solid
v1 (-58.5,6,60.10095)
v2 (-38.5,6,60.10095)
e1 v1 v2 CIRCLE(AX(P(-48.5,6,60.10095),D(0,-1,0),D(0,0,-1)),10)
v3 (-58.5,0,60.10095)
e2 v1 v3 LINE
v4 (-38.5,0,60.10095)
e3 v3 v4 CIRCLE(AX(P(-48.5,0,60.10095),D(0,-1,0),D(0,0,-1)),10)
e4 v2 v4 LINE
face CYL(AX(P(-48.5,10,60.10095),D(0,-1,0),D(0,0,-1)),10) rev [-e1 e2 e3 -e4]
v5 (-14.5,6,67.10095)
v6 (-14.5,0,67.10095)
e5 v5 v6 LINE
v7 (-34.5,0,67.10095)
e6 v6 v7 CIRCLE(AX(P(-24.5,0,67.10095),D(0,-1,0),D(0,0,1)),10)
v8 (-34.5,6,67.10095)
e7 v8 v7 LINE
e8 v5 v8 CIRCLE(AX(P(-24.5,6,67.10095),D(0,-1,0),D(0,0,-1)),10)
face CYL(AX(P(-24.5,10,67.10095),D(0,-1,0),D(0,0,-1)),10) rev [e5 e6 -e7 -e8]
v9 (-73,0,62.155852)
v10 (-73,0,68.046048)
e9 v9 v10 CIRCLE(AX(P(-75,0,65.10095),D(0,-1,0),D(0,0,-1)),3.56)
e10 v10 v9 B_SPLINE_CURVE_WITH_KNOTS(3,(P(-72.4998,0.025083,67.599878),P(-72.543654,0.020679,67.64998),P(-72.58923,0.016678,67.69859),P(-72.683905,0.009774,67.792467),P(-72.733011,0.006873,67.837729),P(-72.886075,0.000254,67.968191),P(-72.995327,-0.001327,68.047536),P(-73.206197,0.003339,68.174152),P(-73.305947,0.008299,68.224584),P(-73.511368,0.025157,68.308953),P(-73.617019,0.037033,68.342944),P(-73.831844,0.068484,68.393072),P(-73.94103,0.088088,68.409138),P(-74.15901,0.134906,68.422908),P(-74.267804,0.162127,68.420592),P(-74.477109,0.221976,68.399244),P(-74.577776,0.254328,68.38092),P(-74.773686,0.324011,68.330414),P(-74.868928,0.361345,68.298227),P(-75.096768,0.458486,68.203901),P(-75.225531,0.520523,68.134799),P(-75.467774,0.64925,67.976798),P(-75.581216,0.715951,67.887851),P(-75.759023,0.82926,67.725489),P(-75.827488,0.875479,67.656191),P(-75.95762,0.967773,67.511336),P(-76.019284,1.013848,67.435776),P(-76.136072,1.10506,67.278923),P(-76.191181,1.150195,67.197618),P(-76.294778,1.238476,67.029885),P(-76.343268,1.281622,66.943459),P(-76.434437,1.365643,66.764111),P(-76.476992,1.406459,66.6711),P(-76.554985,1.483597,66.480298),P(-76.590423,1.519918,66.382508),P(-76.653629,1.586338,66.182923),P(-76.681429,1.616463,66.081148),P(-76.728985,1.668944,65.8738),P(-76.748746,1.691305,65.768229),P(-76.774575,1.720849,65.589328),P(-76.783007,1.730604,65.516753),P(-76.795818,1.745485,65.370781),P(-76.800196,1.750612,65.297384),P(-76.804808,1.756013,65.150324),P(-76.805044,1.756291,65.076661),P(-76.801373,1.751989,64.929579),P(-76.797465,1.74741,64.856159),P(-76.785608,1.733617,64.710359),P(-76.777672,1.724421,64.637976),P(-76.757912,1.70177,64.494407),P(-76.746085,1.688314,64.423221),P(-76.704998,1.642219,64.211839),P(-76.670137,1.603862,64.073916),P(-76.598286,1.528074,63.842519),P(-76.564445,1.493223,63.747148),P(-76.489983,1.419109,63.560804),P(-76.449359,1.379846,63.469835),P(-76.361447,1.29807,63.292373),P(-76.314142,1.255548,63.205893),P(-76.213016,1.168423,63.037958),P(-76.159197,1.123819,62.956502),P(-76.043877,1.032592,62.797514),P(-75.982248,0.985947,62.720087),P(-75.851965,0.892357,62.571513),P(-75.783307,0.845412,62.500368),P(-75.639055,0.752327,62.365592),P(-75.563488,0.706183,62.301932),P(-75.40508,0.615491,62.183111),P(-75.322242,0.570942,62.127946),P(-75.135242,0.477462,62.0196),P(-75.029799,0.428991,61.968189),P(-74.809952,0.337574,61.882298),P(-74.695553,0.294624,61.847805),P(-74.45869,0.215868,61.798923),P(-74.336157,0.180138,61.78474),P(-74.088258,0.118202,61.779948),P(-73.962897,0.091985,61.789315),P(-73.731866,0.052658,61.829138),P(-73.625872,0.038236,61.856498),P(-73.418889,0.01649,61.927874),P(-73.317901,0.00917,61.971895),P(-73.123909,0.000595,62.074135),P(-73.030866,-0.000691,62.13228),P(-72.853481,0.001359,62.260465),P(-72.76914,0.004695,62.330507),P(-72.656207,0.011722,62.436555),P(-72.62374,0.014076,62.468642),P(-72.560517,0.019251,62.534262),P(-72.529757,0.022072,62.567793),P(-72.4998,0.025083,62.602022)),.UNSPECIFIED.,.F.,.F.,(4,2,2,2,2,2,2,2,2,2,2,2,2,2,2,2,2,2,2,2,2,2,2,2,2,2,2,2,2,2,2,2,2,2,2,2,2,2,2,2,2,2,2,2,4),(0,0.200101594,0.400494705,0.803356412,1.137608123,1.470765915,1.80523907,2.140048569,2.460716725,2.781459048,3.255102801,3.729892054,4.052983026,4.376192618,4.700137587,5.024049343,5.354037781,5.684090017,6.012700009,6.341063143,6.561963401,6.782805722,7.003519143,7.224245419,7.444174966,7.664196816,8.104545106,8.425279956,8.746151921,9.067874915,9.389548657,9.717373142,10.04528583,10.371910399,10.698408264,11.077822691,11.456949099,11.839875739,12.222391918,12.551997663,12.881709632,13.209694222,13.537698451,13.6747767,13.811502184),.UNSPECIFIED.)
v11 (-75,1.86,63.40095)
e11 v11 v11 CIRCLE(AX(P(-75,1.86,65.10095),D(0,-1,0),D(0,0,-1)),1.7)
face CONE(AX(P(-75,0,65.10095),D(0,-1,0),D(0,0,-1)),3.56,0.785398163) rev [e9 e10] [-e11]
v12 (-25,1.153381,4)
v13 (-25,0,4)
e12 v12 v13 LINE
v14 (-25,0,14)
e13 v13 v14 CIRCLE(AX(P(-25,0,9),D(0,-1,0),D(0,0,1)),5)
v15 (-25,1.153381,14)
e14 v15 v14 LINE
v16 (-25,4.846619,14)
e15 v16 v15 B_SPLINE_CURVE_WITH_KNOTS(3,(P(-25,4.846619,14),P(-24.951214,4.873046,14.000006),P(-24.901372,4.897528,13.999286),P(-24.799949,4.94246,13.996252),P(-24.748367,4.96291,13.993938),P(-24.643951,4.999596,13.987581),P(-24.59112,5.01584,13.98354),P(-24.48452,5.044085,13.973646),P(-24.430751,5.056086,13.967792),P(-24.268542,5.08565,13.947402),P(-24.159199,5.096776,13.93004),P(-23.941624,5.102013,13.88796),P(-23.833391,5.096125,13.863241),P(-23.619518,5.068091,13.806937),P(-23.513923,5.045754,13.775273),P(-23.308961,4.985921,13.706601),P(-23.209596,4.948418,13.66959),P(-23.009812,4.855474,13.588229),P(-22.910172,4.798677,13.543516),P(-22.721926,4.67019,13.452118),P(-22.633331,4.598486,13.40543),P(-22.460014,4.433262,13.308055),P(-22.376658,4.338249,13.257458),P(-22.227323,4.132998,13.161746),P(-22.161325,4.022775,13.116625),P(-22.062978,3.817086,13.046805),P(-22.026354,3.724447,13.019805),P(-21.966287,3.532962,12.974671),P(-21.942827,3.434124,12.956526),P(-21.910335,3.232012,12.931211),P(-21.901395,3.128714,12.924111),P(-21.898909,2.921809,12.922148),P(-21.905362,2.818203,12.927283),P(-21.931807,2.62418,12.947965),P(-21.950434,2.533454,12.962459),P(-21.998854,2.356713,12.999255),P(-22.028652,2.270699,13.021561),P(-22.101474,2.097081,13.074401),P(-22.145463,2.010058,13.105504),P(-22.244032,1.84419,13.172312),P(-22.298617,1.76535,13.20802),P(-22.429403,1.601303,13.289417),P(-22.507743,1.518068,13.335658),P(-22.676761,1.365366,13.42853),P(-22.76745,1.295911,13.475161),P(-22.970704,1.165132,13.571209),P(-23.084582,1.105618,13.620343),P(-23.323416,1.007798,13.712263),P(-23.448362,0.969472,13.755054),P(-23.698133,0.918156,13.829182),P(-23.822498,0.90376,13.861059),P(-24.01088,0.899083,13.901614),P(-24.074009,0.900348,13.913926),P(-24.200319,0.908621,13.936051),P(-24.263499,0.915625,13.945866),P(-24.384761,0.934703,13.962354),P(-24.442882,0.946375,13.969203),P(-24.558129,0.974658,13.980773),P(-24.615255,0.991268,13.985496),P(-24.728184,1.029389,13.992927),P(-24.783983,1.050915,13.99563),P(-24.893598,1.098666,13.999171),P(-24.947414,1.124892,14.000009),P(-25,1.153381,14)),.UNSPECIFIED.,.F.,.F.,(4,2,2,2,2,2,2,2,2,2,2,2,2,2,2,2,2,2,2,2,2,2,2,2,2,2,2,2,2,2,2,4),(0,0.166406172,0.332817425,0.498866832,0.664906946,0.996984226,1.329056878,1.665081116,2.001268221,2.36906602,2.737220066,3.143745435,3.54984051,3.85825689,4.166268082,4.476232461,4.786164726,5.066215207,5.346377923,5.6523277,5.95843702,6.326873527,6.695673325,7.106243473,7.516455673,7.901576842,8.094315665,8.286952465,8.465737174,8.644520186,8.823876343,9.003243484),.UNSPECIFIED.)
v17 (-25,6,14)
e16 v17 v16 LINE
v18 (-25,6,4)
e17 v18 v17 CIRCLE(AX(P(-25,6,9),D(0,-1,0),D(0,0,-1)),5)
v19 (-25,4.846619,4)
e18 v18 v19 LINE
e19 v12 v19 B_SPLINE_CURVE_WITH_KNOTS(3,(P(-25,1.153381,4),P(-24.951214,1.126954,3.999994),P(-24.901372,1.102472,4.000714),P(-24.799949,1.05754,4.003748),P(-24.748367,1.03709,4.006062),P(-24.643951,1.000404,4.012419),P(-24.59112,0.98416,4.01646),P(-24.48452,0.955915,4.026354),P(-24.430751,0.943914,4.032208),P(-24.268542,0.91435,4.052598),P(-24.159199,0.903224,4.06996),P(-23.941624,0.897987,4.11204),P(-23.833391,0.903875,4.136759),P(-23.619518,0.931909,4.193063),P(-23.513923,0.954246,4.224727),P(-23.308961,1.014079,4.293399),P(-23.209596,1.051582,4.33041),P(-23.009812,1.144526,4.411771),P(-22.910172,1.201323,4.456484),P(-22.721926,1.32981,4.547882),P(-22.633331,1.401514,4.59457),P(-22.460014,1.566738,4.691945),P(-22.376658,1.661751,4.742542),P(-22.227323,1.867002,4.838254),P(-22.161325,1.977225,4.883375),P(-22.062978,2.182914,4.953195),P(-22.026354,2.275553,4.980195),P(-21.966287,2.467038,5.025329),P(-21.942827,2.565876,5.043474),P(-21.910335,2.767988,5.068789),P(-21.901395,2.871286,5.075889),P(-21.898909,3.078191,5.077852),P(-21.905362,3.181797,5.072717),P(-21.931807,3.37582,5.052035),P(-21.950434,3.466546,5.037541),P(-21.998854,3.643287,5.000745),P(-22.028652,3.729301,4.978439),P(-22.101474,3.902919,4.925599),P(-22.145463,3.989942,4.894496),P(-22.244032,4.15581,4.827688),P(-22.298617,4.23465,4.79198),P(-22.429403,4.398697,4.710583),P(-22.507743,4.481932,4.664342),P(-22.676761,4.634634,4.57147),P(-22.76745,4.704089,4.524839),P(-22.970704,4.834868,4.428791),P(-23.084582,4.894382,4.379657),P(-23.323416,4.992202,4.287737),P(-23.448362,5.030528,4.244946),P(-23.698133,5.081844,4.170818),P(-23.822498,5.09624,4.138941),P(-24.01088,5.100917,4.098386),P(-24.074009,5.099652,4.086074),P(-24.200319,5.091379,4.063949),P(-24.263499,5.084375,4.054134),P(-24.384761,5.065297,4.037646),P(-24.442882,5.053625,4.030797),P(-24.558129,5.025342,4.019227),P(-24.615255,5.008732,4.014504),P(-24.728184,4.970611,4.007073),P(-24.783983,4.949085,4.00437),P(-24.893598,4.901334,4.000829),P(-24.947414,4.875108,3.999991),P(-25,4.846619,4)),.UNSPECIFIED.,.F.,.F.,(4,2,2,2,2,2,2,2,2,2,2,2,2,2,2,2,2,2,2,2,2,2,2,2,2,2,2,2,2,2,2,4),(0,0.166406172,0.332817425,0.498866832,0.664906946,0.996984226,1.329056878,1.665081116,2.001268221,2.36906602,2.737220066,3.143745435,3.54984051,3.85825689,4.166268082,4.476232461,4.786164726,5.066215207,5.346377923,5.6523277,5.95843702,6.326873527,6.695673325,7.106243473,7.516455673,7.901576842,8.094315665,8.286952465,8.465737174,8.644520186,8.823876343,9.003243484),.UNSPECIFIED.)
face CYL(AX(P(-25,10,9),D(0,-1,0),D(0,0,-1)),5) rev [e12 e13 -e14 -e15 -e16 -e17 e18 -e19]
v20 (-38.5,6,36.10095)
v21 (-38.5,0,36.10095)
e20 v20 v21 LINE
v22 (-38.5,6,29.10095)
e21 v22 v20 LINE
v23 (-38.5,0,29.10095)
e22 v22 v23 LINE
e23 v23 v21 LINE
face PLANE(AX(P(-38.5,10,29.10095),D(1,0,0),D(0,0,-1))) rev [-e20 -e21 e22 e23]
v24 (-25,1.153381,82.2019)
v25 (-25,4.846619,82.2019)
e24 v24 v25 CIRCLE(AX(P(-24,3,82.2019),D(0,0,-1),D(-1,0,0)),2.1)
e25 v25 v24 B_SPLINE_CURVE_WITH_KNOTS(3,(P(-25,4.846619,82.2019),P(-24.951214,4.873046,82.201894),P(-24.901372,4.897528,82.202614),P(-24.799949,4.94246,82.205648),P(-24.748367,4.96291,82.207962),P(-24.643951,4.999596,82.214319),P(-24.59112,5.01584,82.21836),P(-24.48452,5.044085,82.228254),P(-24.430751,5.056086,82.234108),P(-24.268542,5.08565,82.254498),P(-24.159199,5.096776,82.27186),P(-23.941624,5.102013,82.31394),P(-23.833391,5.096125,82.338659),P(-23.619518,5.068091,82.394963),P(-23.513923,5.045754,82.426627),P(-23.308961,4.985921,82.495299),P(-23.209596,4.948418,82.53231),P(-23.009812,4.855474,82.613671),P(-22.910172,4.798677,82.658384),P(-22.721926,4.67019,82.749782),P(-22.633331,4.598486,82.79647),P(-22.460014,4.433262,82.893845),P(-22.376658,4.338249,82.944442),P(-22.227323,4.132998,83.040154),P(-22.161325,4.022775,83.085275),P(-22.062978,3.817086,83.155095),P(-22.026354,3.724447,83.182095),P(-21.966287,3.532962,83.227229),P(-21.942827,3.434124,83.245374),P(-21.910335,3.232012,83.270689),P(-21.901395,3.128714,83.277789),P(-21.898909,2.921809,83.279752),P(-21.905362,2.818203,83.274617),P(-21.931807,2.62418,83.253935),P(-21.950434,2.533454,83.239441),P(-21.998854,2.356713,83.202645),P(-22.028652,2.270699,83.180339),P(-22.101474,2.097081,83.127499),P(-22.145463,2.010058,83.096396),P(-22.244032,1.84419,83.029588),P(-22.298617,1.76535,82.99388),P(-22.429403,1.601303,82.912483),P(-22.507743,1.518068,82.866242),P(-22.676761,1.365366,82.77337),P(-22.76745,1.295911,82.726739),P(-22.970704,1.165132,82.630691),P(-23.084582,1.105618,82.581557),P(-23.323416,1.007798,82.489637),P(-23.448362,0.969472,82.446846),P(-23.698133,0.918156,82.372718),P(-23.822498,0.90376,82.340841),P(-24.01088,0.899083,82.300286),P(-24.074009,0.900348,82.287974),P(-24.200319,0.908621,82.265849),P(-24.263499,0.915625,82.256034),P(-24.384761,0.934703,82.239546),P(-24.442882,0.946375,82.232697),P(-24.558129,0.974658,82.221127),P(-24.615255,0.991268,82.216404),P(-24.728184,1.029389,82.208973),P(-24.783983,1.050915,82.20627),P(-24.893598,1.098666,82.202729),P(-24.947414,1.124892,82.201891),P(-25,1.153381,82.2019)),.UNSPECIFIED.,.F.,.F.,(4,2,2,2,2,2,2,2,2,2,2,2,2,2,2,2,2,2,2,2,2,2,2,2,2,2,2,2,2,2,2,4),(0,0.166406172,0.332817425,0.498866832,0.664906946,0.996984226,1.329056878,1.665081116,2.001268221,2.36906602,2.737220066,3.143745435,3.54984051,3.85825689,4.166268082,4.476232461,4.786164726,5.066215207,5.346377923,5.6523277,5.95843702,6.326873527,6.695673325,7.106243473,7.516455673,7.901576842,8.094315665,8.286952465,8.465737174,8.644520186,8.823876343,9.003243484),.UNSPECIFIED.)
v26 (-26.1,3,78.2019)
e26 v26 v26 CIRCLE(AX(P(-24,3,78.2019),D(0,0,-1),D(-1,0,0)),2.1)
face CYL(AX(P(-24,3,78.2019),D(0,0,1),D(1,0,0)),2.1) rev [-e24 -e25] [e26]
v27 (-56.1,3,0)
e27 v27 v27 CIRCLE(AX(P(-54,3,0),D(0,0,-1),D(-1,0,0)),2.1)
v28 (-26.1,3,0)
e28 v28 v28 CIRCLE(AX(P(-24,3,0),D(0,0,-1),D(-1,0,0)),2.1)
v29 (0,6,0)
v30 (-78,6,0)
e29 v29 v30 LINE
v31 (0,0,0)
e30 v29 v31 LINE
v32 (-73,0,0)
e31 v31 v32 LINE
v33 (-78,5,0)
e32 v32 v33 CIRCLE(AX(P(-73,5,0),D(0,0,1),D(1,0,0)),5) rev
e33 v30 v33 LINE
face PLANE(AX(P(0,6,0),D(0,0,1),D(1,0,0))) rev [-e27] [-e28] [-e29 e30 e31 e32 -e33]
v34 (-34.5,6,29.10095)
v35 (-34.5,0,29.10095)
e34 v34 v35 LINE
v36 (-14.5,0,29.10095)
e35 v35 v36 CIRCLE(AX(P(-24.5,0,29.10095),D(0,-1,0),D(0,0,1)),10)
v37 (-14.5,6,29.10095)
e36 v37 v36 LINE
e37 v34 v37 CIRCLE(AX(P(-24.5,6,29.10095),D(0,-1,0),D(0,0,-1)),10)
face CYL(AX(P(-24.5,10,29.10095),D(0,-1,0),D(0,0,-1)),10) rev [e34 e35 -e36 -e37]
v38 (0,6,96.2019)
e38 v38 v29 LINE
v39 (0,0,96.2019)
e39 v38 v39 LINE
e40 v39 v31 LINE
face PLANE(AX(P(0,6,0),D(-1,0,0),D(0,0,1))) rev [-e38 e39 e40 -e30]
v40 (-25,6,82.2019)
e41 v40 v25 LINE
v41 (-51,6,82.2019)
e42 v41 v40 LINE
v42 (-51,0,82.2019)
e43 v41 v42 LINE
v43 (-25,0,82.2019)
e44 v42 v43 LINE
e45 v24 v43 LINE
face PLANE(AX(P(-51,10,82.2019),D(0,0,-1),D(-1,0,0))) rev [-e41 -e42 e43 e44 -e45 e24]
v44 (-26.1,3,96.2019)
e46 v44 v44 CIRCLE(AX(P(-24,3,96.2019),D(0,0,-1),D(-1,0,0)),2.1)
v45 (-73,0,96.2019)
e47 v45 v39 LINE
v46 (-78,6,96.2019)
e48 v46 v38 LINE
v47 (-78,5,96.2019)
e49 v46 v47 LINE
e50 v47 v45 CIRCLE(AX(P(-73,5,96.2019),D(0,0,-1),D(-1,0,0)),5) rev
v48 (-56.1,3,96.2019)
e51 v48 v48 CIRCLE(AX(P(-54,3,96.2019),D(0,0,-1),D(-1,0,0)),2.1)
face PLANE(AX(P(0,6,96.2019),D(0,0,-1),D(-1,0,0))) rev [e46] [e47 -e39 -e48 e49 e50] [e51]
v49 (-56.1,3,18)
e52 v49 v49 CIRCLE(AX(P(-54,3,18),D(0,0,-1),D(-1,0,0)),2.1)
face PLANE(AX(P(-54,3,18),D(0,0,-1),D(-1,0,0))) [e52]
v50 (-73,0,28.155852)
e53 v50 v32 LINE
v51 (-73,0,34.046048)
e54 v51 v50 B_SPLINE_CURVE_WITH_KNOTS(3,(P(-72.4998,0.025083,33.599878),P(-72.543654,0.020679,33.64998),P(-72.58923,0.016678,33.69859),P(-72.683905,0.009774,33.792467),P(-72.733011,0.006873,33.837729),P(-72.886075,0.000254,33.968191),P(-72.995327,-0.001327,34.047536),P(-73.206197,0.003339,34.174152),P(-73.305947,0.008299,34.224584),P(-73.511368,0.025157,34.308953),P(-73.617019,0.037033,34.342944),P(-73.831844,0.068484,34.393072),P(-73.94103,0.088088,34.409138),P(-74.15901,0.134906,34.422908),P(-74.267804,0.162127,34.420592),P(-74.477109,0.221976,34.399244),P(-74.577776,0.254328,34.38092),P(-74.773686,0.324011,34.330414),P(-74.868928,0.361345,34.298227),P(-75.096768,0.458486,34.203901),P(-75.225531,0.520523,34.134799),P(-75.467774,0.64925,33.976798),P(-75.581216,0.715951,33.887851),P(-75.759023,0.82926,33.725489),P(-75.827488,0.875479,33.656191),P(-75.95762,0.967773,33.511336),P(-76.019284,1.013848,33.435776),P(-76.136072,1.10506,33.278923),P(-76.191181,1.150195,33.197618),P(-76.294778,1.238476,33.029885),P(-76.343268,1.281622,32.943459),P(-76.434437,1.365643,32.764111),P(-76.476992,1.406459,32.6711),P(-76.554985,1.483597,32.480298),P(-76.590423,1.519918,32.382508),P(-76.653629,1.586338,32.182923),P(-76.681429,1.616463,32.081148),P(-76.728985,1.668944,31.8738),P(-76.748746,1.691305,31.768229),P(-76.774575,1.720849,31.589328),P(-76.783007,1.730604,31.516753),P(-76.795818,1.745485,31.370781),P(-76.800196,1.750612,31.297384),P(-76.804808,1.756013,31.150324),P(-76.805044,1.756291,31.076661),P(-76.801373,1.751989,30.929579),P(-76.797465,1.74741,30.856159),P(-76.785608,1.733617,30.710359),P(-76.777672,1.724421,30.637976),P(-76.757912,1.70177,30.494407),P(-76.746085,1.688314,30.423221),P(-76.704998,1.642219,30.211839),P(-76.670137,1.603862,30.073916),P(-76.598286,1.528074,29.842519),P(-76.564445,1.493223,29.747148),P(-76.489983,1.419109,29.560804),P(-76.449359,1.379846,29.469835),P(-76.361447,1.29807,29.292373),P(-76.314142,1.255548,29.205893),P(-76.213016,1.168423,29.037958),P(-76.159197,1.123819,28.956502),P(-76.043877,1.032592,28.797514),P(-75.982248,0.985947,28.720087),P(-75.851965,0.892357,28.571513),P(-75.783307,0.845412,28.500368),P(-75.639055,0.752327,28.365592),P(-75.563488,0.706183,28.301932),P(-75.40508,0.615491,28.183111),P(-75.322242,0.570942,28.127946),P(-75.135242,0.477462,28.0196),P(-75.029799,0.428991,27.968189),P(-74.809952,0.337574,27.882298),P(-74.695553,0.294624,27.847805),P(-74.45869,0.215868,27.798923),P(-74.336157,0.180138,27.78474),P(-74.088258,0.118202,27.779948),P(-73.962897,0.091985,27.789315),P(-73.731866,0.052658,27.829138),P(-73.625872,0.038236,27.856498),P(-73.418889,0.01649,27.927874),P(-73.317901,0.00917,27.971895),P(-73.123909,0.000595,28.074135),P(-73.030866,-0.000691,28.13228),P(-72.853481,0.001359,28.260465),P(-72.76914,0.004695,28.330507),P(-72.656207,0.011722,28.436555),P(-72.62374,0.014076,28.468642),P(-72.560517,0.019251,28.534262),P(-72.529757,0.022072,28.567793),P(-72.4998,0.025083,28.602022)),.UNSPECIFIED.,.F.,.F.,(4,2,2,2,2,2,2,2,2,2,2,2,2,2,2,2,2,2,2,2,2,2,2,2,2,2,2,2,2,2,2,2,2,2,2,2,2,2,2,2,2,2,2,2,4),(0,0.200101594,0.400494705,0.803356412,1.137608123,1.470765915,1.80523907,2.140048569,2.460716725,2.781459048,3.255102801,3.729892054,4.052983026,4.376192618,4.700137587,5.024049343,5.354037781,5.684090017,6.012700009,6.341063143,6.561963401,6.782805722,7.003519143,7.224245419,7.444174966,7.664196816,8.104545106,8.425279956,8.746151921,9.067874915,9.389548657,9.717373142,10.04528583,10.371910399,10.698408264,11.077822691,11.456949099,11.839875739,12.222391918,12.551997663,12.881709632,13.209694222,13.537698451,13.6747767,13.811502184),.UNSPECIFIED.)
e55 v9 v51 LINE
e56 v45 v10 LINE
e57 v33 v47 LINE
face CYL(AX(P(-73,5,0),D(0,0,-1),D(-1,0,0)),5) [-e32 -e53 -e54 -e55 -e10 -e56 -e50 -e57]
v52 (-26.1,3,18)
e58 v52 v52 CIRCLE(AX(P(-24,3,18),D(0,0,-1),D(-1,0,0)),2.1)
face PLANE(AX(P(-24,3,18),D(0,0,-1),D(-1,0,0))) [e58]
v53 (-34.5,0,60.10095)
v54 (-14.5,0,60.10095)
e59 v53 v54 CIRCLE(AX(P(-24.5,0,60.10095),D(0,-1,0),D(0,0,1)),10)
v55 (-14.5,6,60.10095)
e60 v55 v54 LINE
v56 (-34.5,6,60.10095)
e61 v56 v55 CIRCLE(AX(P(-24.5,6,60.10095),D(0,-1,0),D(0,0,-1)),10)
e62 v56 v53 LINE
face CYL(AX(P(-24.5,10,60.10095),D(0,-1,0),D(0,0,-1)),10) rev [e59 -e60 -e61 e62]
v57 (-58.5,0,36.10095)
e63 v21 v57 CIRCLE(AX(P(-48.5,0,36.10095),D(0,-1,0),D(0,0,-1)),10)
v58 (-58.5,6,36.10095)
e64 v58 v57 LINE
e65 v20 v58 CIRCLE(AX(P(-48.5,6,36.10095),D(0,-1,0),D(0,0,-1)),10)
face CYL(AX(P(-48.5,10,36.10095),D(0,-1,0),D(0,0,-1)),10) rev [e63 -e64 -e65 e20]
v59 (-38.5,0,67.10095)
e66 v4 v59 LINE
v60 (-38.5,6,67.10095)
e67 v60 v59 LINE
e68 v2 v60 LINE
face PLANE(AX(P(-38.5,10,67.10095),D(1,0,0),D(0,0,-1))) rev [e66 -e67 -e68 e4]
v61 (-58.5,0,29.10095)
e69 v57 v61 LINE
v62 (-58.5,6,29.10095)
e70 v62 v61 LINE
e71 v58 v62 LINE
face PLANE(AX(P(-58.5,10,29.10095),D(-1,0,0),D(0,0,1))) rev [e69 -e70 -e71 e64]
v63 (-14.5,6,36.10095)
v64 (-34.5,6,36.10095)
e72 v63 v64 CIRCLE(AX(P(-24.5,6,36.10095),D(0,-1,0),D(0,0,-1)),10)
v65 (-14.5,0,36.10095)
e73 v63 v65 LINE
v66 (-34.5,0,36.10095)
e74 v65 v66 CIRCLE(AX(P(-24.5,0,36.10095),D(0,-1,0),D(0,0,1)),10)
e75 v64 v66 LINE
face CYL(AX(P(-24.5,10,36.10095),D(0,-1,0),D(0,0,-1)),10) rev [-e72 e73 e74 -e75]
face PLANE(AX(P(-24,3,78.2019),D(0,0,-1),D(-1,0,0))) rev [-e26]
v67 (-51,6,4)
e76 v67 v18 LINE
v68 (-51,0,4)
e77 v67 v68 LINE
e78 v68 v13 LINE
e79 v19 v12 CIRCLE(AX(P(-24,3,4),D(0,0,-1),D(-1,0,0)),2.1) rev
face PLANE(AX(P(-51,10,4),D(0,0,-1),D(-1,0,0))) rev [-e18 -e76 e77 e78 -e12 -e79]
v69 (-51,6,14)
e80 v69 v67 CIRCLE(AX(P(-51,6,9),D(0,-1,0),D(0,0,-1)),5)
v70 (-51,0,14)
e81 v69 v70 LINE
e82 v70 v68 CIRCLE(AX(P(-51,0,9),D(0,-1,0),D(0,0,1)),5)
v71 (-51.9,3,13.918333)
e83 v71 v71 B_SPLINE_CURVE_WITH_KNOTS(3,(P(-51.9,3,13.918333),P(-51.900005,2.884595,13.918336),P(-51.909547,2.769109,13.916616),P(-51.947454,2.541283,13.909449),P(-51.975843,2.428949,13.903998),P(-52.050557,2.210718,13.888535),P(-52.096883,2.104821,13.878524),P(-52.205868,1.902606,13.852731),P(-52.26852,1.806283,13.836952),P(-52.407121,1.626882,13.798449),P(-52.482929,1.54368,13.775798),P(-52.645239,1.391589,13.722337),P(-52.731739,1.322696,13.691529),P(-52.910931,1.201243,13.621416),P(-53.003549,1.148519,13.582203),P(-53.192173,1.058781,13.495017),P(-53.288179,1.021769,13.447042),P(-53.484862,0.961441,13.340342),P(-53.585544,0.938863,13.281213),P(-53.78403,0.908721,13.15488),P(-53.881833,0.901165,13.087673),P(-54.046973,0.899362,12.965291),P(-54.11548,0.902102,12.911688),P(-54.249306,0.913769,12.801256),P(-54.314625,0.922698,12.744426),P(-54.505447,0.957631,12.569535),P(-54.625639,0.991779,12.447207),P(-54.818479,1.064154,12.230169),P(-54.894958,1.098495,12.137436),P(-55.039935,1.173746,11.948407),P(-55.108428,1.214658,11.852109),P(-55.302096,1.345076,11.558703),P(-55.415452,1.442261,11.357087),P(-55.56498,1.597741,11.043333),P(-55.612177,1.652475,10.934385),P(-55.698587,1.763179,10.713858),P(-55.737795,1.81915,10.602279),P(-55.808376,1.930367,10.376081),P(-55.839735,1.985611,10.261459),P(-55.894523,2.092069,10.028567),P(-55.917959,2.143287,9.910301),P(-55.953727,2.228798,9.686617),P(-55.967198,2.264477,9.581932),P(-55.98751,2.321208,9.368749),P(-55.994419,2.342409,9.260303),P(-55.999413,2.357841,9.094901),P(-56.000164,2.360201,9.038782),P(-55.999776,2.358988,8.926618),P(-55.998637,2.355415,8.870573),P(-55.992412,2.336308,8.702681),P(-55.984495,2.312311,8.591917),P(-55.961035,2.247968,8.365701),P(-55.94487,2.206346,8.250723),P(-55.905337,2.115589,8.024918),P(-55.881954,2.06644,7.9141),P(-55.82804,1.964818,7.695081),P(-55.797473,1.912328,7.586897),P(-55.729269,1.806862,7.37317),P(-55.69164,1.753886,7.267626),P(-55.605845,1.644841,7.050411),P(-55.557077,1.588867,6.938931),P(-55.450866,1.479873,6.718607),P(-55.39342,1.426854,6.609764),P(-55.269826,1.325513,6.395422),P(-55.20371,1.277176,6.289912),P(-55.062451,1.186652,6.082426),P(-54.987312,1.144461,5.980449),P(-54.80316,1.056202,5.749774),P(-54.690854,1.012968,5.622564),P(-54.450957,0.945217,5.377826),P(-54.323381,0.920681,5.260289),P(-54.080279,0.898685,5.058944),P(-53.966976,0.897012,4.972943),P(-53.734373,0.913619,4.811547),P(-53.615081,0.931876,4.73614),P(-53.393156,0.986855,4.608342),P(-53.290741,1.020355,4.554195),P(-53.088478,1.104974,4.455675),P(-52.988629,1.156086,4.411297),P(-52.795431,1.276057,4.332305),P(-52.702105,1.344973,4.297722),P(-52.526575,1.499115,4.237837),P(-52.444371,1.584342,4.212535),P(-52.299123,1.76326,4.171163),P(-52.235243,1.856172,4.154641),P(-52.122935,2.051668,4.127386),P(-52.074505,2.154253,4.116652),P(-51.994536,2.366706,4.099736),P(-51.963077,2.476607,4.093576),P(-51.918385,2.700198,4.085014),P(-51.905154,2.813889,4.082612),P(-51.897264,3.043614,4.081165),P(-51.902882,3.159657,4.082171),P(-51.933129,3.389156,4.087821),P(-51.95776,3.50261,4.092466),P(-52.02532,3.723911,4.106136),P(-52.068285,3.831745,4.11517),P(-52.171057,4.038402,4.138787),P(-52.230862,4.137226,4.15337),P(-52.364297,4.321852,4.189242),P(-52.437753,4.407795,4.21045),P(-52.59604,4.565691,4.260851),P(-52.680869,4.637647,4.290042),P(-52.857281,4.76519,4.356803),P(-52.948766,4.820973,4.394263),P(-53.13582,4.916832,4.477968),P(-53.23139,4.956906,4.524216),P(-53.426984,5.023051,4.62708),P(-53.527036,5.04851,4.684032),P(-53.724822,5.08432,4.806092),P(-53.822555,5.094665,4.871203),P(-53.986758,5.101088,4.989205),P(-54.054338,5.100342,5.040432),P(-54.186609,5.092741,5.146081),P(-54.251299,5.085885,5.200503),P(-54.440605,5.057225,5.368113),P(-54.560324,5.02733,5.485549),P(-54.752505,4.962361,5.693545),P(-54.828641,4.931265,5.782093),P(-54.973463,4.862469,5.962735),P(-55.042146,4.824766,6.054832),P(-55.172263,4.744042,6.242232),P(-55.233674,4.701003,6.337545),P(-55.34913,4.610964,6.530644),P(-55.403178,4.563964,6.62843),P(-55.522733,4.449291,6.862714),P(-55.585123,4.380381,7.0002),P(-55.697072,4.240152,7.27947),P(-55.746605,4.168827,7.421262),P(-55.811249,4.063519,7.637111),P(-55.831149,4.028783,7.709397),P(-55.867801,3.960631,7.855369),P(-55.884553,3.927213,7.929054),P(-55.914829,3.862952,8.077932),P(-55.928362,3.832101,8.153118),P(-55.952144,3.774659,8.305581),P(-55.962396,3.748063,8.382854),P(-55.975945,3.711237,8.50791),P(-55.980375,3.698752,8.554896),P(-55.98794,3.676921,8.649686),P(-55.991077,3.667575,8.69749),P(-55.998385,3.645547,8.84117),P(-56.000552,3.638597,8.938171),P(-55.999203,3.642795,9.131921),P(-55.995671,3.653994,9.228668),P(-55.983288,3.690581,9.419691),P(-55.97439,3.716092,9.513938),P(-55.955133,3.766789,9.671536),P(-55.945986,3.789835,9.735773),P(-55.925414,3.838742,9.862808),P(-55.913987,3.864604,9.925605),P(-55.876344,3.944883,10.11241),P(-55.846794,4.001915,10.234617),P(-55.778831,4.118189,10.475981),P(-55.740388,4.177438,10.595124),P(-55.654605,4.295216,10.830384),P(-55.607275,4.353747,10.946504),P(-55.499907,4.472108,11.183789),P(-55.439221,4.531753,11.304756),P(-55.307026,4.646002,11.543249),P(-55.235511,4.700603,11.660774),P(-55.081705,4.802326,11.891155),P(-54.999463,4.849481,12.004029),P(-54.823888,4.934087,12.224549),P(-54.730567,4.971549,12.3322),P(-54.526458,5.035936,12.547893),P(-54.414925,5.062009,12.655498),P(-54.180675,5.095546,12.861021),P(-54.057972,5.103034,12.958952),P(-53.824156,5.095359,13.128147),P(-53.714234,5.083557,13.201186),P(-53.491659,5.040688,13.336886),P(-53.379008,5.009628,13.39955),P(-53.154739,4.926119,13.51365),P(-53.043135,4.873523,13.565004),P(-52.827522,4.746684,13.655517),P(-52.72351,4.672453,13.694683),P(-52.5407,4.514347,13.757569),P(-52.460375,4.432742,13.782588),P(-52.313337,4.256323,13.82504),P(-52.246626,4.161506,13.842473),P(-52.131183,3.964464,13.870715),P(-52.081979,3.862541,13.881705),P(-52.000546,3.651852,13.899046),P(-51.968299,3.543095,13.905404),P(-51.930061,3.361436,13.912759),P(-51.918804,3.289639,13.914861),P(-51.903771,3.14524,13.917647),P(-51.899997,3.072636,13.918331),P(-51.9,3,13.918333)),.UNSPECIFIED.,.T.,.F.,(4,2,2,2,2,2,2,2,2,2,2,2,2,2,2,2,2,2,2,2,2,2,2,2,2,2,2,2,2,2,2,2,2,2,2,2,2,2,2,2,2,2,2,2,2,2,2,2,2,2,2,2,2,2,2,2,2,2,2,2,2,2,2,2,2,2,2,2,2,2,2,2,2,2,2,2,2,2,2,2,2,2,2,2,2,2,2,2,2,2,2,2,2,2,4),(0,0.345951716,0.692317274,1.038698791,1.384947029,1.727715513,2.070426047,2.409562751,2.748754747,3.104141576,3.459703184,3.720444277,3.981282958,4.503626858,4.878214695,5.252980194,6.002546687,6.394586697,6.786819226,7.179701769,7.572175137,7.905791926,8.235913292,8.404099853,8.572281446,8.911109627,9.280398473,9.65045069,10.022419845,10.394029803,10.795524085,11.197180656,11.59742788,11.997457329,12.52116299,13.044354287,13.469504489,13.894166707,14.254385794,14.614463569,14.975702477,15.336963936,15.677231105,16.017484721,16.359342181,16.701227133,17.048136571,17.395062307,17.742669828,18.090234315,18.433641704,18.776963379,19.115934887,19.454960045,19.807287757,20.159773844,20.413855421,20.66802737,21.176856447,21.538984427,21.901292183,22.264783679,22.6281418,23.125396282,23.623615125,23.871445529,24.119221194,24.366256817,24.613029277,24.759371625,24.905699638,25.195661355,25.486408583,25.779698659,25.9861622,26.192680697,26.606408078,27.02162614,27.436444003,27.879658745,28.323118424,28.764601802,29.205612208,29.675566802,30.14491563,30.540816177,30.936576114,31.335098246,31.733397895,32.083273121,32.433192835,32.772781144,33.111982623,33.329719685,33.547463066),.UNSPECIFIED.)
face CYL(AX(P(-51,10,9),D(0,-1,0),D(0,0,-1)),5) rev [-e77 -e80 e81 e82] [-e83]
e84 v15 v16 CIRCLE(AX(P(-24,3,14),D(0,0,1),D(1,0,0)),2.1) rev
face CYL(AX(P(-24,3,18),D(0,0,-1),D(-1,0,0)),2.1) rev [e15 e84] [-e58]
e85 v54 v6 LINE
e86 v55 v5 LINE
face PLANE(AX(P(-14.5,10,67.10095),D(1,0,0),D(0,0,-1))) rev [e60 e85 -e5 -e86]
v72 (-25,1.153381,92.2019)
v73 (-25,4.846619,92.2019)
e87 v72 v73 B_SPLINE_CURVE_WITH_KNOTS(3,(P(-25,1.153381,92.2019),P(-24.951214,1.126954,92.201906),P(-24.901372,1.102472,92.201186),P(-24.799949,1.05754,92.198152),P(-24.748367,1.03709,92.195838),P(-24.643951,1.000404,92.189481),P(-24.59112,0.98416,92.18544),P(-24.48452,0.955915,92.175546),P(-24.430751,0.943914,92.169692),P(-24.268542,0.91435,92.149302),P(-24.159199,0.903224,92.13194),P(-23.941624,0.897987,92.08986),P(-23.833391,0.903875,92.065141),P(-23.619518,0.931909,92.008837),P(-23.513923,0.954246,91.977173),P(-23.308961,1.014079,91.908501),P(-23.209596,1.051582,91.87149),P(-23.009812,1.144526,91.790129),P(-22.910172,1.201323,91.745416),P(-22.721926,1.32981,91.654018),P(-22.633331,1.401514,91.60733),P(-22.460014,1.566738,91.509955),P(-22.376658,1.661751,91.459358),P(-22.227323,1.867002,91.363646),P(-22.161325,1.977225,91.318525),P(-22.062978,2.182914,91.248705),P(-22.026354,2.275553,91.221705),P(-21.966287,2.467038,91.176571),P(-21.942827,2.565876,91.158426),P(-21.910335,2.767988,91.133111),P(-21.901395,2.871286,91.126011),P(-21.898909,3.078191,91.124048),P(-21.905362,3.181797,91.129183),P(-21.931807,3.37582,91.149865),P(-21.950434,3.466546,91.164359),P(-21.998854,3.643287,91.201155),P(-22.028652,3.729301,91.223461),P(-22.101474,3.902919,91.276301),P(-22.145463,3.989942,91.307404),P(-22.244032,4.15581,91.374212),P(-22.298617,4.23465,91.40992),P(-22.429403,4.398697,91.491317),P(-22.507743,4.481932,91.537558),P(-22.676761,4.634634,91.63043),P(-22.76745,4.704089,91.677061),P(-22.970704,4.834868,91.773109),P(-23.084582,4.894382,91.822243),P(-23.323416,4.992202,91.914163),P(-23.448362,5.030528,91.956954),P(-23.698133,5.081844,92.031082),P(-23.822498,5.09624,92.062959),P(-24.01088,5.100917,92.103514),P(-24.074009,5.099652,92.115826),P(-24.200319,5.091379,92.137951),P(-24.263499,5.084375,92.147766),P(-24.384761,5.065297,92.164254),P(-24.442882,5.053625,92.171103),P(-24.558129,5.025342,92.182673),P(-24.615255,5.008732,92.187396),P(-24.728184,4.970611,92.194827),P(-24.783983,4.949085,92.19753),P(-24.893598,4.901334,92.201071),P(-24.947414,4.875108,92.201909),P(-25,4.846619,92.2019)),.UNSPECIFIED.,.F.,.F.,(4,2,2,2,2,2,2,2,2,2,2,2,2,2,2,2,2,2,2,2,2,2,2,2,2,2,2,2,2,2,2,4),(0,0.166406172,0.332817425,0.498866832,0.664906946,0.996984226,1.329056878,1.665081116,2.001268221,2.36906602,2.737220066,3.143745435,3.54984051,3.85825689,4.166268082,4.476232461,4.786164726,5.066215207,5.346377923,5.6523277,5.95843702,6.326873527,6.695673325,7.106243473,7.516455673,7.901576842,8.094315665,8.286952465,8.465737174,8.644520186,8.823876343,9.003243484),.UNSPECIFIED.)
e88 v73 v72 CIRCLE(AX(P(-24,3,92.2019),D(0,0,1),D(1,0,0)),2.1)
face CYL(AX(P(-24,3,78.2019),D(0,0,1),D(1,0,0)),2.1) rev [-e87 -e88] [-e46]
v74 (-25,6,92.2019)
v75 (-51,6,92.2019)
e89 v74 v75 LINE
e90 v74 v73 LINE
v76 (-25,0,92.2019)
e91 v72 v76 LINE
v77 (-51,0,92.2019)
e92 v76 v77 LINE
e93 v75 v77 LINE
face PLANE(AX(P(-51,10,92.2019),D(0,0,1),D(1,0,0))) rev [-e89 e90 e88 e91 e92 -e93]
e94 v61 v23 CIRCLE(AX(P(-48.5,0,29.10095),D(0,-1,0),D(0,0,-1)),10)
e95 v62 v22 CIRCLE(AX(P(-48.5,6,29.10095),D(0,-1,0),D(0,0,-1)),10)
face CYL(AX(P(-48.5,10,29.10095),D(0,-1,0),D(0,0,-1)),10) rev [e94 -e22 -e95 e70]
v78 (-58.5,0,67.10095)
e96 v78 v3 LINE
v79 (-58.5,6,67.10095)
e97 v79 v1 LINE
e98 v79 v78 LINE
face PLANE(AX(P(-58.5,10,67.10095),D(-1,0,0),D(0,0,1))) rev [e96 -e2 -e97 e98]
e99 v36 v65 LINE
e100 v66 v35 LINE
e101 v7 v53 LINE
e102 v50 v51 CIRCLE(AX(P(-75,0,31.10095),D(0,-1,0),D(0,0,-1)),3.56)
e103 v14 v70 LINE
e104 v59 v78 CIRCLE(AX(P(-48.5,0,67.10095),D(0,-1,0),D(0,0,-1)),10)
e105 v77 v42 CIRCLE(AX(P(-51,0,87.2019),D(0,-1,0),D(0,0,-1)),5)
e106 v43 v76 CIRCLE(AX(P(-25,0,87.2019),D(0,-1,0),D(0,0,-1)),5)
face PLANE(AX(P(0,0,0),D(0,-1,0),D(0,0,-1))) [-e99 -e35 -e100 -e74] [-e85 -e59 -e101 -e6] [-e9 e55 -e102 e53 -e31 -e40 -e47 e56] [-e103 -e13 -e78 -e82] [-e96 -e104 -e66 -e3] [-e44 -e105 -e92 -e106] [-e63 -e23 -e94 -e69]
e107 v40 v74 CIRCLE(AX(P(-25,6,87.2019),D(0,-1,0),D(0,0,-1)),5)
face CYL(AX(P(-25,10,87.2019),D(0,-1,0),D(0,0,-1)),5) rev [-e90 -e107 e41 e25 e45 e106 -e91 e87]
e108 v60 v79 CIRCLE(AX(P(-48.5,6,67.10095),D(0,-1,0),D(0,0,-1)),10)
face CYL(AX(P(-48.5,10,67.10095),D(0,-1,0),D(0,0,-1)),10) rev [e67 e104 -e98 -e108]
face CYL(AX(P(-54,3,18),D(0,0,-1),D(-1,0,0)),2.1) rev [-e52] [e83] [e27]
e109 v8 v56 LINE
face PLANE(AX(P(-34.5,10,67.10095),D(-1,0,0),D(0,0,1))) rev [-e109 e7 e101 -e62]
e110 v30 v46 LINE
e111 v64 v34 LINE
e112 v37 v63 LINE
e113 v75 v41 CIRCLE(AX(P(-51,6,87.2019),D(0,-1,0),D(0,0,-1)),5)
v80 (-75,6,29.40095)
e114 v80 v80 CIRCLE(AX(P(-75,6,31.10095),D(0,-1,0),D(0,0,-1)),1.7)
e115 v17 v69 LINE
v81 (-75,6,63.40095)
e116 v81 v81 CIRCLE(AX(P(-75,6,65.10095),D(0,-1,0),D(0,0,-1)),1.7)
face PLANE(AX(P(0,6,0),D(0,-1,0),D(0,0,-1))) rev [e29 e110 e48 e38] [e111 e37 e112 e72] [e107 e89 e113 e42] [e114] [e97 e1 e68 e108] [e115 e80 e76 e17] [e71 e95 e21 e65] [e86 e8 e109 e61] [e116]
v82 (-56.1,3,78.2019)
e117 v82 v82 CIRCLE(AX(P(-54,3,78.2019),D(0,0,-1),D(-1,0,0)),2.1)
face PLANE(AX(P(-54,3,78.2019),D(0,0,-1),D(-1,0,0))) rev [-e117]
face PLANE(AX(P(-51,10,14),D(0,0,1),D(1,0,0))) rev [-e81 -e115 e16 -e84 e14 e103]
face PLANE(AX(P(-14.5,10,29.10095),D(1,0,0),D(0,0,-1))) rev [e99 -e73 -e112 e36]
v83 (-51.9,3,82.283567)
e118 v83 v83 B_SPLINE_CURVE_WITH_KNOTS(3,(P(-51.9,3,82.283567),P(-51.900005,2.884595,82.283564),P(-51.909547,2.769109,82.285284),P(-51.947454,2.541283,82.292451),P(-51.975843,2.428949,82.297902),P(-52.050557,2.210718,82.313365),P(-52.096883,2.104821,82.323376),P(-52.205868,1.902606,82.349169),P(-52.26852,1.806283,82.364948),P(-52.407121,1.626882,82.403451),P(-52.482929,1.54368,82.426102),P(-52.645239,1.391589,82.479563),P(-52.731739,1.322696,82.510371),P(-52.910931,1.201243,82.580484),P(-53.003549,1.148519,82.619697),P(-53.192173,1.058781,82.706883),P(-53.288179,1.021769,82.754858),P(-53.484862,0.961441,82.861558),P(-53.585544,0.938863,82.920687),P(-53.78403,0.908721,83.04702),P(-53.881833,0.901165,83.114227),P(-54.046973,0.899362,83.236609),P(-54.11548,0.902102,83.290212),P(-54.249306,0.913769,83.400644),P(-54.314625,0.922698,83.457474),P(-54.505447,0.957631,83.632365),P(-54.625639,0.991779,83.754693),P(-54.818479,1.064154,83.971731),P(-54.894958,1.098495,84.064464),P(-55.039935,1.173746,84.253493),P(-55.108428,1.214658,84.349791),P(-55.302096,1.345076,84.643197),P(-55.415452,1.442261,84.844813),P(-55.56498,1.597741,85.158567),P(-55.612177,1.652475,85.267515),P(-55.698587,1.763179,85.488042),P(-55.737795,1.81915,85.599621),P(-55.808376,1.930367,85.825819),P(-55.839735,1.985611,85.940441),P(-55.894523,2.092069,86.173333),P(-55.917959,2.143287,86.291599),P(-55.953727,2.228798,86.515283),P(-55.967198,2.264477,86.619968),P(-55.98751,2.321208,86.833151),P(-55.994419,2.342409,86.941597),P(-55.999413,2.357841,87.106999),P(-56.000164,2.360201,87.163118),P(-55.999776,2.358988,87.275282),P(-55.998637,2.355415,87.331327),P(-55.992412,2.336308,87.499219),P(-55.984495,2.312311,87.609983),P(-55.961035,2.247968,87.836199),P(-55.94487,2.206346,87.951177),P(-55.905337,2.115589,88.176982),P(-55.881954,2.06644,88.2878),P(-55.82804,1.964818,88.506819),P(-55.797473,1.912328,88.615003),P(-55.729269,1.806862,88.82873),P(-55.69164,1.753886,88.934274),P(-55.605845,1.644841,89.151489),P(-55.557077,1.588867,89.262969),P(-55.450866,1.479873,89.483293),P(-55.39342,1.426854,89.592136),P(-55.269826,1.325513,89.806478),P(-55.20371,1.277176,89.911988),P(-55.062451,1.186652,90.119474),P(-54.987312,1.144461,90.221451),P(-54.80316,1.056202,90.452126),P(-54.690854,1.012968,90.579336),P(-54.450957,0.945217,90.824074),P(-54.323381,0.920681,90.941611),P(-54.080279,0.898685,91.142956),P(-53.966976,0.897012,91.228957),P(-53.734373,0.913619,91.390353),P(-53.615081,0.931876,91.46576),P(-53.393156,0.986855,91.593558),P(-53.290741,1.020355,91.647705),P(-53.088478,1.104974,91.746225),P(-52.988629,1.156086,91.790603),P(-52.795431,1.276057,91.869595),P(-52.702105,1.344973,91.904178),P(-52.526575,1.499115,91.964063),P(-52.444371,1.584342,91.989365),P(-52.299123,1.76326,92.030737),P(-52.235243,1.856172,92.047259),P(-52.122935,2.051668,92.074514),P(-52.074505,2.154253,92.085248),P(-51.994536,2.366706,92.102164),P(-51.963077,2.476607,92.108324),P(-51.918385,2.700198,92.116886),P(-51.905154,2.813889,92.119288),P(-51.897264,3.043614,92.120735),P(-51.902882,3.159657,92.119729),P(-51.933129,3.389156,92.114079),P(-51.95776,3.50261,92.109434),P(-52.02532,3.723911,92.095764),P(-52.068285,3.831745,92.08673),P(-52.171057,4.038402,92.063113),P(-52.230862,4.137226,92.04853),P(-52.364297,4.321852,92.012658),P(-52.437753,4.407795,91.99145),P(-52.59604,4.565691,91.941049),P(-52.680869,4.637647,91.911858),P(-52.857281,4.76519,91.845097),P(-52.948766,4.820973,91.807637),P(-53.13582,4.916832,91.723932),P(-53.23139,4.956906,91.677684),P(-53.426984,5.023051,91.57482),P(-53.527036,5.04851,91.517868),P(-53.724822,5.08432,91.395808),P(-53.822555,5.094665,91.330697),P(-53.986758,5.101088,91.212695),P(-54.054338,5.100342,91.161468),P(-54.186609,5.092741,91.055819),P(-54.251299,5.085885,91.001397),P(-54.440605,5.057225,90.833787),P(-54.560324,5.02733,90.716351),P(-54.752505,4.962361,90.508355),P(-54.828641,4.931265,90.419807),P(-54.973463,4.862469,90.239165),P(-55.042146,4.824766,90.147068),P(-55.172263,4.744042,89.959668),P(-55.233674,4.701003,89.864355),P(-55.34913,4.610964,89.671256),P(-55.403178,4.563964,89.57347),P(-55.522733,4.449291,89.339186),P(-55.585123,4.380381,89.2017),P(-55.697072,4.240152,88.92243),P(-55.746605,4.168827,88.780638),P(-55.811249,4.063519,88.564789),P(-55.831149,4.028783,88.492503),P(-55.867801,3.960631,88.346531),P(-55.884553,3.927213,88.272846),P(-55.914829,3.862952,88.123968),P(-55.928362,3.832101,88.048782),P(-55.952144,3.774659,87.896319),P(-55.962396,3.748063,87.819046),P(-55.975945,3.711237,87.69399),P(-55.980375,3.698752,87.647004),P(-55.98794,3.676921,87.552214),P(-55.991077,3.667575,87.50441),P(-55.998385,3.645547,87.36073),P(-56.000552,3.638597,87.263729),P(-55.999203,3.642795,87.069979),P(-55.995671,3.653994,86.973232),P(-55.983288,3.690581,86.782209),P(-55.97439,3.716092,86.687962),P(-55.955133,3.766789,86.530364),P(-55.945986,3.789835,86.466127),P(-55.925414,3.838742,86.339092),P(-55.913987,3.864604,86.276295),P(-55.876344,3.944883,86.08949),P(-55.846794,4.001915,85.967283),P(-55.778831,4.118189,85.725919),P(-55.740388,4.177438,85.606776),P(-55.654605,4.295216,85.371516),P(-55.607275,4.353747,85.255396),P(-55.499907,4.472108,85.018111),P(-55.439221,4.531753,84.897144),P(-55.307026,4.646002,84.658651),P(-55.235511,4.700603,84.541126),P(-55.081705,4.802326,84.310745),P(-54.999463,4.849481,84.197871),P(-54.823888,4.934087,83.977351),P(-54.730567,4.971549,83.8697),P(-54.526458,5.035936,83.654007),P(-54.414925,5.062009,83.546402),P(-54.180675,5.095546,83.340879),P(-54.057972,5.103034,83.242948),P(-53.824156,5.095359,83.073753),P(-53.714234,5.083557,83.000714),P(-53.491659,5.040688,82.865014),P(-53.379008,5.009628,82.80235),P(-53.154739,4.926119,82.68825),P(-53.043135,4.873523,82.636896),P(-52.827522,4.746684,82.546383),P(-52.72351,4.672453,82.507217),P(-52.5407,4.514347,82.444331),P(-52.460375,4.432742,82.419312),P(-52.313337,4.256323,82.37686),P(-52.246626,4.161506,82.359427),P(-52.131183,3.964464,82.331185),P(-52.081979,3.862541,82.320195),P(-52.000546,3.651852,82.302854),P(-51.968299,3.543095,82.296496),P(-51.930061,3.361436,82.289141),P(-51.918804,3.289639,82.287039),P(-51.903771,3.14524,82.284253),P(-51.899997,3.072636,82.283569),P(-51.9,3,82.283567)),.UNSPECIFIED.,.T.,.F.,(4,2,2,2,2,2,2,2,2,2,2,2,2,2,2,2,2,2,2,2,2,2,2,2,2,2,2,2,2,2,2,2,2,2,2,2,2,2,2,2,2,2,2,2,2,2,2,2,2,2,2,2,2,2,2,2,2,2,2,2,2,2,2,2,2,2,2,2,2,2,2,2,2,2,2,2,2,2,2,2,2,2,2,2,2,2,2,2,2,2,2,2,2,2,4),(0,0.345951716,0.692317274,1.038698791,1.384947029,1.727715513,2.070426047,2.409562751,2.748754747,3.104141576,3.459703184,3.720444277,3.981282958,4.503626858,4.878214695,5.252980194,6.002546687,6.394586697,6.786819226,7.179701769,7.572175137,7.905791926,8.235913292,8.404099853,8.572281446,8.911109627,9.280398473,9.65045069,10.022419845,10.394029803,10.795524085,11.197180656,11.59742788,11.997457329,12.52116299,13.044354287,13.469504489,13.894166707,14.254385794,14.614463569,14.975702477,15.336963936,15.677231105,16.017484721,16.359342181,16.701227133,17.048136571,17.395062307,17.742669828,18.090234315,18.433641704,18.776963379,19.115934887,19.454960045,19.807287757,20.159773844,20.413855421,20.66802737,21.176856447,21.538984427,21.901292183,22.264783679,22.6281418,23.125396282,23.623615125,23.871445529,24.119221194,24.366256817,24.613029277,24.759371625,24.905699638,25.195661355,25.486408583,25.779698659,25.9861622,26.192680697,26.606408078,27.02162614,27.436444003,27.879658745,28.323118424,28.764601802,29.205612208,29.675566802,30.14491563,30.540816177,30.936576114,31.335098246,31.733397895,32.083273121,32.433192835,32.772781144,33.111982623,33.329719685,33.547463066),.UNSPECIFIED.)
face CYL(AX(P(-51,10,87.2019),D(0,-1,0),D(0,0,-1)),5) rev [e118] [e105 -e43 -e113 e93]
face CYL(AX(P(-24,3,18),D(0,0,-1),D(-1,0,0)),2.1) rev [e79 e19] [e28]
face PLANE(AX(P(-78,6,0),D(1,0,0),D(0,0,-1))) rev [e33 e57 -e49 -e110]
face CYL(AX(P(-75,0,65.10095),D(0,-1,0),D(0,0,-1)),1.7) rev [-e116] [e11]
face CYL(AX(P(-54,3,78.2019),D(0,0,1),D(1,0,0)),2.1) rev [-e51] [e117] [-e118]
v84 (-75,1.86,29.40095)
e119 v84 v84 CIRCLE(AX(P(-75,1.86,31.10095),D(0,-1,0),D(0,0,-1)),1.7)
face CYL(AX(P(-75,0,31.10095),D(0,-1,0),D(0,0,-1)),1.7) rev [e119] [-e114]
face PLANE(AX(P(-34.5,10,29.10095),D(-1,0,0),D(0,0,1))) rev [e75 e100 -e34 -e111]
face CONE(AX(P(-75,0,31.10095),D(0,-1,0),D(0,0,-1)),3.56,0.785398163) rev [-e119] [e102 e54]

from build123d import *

# Parameters (mm, degrees)
SKETCH1_W                     = 78
SKETCH1_H                     = 96.2019
BOSS_EXTRUDE1_DEPTH           = 6
SKETCH2_R                     = 1.5
CUT_EXTRUDE2_DEPTH            = 124.995183631
SKETCH3_R                     = 2.1
CUT_EXTRUDE3_DEPTH            = 18
CUT_EXTRUDE4_START            = -78.2019
SKETCH3_2_R                   = 2.1
CUT_EXTRUDE4_DEPTH            = 18
FILLET1_R                     = 5
CUT_EXTRUDE5_DEPTH            = 10
CSK_FOR_M3_SFHCS2_D           = 3.4
CSK_FOR_M3_SFHCS2_CSINK_D     = 7.12
CSK_FOR_M3_SFHCS2_CSINK_ANGLE = 90


with BuildPart() as part:
    # Sketch1 → Boss-Extrude1 (new body)
    with BuildSketch(Plane(origin=(0, 0, 0), x_dir=(-1, 0, 0), z_dir=(0, 1, 0))):
        with Locations((39, 48.10095)):
            Rectangle(SKETCH1_W, SKETCH1_H)
    extrude(amount=BOSS_EXTRUDE1_DEPTH)

    # Sketch2 → Cut-Extrude2 (cut, through all)
    with BuildSketch(Plane(origin=(0, 0, 0), x_dir=(-1, 0, 0), z_dir=(0, -1, 0))):
        with Locations(Location((75, -31.10095, 0), (0, 0, 90))):
            Circle(SKETCH2_R)
        with Locations(Location((75, -65.10095, 0), (0, 0, 90))):
            Circle(SKETCH2_R)
    extrude(amount=-CUT_EXTRUDE2_DEPTH, mode=Mode.SUBTRACT)

    # Sketch3 → Cut-Extrude3 (cut)
    with BuildSketch(Plane(origin=(0, 0, 0), x_dir=(1, 0, 0), z_dir=(0, 0, -1))):
        with Locations(Location((-54, -3, 0), (0, 0, 180))):
            Circle(SKETCH3_R)
        with Locations(Location((-24, -3, 0), (0, 0, 180))):
            Circle(SKETCH3_R)
    extrude(amount=-CUT_EXTRUDE3_DEPTH, mode=Mode.SUBTRACT)

    # Sketch3<2> → Cut-Extrude4 (cut)
    with BuildSketch(Plane(origin=(0, 0, 0), x_dir=(1, 0, 0), z_dir=(0, 0, -1)).offset(CUT_EXTRUDE4_START)):
        with Locations(Location((-54, -3, 0), (0, 0, 180))):
            Circle(SKETCH3_2_R)
        with Locations(Location((-24, -3, 0), (0, 0, 180))):
            Circle(SKETCH3_2_R)
    extrude(amount=-CUT_EXTRUDE4_DEPTH, mode=Mode.SUBTRACT)

    # Fillet1
    # the kernel refuses this fillet: 5 mm, written as the material it takes off along each edge
    with BuildSketch(Plane(origin=(-78, 0, -12.5), x_dir=(1, 0, 0), z_dir=(0, 0, 1))) as fillet1_piece_1:
        with BuildLine():
            CenterArc((FILLET1_R, FILLET1_R), FILLET1_R, 180, 90)
            Line((0, FILLET1_R), (0, 0))
            Line((0, 0), (FILLET1_R, 0))
        make_face()
    extrude(amount=121.2019, mode=Mode.SUBTRACT)

    # Sketch4 → Cut-Extrude5 (cut)
    with BuildSketch(Plane.XZ):
        with BuildLine():
            Line((-51, 92.2019), (-25, 92.2019))
            ThreePointArc((-25, 92.2019), (-20, 87.2019), (-25, 82.2019))
            Line((-25, 82.2019), (-51, 82.2019))
            ThreePointArc((-51, 82.2019), (-56, 87.2019), (-51, 92.2019))
        make_face()
        with BuildLine():
            Line((-58.5, 29.10095), (-58.5, 36.10095))
            ThreePointArc((-58.5, 36.10095), (-48.5, 46.10095), (-38.5, 36.10095))
            Line((-38.5, 36.10095), (-38.5, 29.10095))
            ThreePointArc((-38.5, 29.10095), (-48.5, 19.10095), (-58.5, 29.10095))
        make_face()
        with BuildLine():
            Line((-38.5, 67.10095), (-38.5, 60.10095))
            ThreePointArc((-38.5, 60.10095), (-48.5, 50.10095), (-58.5, 60.10095))
            Line((-58.5, 60.10095), (-58.5, 67.10095))
            ThreePointArc((-58.5, 67.10095), (-48.5, 77.10095), (-38.5, 67.10095))
        make_face()
        with BuildLine():
            Line((-14.5, 29.10095), (-14.5, 36.10095))
            ThreePointArc((-14.5, 36.10095), (-24.5, 46.10095), (-34.5, 36.10095))
            Line((-34.5, 36.10095), (-34.5, 29.10095))
            ThreePointArc((-34.5, 29.10095), (-24.5, 19.10095), (-14.5, 29.10095))
        make_face()
        with BuildLine():
            Line((-34.5, 67.10095), (-34.5, 60.10095))
            ThreePointArc((-34.5, 60.10095), (-24.5, 50.10095), (-14.5, 60.10095))
            Line((-14.5, 60.10095), (-14.5, 67.10095))
            ThreePointArc((-14.5, 67.10095), (-24.5, 77.10095), (-34.5, 67.10095))
        make_face()
        with BuildLine():
            Line((-51, 4), (-25, 4))
            ThreePointArc((-25, 4), (-20, 9), (-25, 14))
            Line((-25, 14), (-51, 14))
            ThreePointArc((-51, 14), (-56, 9), (-51, 4))
        make_face()
    extrude(amount=-CUT_EXTRUDE5_DEPTH, mode=Mode.SUBTRACT)

    # CSK for M3 SFHCS2 (through all)
    with Locations(Plane(origin=(0, 0, 0), x_dir=(-1, 0, 0), z_dir=(0, -1, 0))):
        with Locations((75, -31.10095), (75, -65.10095)):
            CounterSinkHole(CSK_FOR_M3_SFHCS2_D / 2, CSK_FOR_M3_SFHCS2_CSINK_D / 2, counter_sink_angle=CSK_FOR_M3_SFHCS2_CSINK_ANGLE)


solid = part.part
